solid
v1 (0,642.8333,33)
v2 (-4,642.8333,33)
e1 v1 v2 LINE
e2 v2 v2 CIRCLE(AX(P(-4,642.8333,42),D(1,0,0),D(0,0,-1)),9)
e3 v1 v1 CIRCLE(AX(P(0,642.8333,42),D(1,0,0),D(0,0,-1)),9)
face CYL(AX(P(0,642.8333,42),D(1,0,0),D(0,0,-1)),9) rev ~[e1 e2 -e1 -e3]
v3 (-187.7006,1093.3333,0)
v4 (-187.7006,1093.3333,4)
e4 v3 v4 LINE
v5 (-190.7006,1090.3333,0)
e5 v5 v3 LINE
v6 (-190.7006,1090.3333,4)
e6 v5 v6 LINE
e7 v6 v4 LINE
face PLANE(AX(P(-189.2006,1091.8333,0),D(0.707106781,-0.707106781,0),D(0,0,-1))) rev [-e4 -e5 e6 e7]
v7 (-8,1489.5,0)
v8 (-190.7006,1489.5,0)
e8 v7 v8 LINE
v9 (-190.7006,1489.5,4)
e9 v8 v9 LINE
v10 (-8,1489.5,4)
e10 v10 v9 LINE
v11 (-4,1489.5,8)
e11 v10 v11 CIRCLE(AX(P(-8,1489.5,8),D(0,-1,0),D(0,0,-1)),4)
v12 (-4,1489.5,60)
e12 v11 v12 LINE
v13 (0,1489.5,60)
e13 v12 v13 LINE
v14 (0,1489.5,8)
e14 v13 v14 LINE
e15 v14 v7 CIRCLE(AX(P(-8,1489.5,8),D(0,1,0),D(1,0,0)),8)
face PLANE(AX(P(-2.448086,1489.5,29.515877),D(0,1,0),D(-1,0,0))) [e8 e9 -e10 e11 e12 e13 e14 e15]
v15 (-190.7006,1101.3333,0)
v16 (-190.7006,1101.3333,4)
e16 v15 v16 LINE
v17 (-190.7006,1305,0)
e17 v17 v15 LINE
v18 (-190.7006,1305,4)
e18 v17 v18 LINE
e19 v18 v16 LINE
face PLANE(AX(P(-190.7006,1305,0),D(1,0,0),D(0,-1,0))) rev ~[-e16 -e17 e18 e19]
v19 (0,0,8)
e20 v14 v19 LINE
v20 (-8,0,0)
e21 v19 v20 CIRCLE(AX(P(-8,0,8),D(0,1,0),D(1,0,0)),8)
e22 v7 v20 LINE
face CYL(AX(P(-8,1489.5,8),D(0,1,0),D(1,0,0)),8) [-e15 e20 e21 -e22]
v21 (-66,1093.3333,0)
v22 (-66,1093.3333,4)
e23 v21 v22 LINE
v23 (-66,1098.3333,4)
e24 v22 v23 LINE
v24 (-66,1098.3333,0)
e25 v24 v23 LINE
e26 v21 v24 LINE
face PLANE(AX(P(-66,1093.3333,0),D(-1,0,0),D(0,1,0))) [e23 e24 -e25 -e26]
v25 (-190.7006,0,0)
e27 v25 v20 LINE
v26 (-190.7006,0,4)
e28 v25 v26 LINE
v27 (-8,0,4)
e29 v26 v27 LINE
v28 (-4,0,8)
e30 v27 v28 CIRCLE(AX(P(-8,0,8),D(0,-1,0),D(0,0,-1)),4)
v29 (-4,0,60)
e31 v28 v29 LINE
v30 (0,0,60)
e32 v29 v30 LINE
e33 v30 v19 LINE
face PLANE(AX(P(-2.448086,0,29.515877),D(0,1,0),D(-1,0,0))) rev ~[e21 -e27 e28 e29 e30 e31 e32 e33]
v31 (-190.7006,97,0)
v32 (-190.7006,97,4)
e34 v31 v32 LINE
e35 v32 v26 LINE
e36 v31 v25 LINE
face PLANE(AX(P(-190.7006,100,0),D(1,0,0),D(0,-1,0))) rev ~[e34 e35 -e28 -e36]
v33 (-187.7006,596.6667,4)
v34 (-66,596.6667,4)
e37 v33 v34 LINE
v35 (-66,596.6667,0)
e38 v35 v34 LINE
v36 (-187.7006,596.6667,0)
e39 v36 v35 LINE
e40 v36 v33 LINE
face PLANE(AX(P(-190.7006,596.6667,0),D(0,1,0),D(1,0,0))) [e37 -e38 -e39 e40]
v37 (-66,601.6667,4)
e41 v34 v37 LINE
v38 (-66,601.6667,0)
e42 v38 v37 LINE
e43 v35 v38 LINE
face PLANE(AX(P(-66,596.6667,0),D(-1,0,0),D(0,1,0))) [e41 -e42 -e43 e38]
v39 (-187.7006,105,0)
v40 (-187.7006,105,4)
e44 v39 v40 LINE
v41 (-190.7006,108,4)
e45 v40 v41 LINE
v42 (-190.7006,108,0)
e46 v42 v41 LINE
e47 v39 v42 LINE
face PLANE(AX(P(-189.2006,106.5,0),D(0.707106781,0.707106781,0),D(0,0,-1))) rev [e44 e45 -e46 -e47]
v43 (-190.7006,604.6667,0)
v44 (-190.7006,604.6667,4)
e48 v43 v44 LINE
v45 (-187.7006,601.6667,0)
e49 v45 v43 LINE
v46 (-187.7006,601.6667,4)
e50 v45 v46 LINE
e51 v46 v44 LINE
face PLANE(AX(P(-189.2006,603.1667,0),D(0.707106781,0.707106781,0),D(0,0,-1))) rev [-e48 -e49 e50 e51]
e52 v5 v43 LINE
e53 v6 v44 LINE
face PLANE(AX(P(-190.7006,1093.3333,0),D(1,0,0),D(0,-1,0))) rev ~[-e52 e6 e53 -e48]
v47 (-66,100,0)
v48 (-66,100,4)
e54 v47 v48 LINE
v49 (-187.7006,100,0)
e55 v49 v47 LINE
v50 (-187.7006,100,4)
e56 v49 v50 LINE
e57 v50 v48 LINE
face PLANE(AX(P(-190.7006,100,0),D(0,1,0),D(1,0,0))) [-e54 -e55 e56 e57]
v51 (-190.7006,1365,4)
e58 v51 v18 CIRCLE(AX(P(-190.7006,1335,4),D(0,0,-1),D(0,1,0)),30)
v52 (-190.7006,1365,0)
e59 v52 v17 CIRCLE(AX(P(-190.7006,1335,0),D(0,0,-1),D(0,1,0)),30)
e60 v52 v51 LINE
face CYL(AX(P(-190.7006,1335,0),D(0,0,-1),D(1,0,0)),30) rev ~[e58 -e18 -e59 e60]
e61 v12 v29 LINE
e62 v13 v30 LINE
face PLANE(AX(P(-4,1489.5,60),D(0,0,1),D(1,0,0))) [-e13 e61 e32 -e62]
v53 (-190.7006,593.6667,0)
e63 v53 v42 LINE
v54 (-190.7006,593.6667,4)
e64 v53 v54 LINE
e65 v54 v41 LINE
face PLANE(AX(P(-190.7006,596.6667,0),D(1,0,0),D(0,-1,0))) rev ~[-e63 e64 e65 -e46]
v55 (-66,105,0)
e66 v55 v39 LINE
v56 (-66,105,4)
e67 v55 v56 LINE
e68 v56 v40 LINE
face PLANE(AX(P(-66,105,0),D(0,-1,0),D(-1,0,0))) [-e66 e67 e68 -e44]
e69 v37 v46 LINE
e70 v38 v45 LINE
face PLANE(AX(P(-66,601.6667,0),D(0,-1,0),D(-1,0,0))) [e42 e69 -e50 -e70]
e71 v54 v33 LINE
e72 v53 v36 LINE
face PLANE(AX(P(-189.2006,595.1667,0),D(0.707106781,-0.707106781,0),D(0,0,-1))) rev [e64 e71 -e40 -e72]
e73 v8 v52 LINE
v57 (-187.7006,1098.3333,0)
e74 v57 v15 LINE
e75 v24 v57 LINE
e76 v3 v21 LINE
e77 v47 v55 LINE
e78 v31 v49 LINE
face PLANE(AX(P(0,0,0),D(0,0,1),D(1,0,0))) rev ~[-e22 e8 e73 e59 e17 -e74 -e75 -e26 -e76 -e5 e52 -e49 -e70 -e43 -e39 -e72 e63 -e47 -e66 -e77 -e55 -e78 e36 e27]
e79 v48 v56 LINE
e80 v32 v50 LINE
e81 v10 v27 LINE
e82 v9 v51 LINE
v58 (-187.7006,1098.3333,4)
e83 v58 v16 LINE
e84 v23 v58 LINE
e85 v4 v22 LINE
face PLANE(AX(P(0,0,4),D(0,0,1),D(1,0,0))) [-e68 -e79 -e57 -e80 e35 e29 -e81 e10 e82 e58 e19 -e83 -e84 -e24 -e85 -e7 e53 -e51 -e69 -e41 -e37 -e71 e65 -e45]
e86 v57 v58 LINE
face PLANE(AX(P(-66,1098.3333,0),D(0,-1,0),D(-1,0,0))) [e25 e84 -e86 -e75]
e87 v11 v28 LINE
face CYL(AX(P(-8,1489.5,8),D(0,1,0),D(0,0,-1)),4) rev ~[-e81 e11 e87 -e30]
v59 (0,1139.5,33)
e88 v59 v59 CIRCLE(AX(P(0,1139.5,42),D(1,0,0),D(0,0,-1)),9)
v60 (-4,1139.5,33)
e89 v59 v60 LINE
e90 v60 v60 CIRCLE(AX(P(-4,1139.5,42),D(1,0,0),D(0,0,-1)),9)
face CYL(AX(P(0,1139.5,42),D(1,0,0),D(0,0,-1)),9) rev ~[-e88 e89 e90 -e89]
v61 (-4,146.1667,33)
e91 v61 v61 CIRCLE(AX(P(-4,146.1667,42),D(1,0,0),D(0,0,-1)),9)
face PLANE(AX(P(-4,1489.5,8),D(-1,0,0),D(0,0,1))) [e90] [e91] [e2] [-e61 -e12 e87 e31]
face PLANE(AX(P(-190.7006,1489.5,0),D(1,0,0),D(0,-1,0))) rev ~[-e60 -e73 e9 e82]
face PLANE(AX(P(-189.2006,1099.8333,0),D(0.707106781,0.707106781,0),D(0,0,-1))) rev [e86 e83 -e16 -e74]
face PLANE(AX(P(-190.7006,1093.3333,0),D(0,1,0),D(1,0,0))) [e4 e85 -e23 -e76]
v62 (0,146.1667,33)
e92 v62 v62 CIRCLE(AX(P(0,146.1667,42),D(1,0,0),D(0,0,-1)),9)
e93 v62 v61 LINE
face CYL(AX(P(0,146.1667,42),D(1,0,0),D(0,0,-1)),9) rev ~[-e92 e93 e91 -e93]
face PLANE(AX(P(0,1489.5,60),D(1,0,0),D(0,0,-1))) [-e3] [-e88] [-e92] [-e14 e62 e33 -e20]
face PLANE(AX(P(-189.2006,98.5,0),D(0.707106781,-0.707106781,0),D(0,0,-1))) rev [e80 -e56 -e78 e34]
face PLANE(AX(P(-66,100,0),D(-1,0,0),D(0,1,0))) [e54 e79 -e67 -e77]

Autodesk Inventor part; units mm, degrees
ref_plane "YZ Plane" through (0, 0, 0) normal (1, 0, 0) x (0, 1, 0)
ref_plane "XZ Plane" through (0, 0, 0) normal (0, 1, 0) x (-1, 0, 0)
ref_plane "XY Plane" through (0, 0, 0) normal (0, 0, 1) x (1, 0, 0)
sketch "Sketch1" plane through (0, 0, 0) normal (0, 0, 1) x (1, 0, 0)
  line L0 (0, 1489.5) -> (-190.7006, 1489.5)
  line L1 (-190.7006, 1489.5) -> (-190.7006, 0)
  line L2 (-190.7006, 0) -> (0, 0)
  line L3 (0, 0) -> (0, 1489.5)
  line L4 (-190.7006, 100) -> (-66, 100)
  line L5 (-66, 100) -> (-66, 105)
  line L6 (-66, 105) -> (-190.7006, 105)
  line L7 (-190.7006, 105) -> (-190.7006, 100)
  line L8 (-190.7006, 596.6667) -> (-66, 596.6667)
  line L9 (-66, 596.6667) -> (-66, 601.6667)
  line L10 (-66, 601.6667) -> (-190.7006, 601.6667)
  line L11 (-190.7006, 601.6667) -> (-190.7006, 596.6667)
  line L12 (-190.7006, 1093.3333) -> (-66, 1093.3333)
  line L13 (-66, 1093.3333) -> (-66, 1098.3333)
  line L14 (-66, 1098.3333) -> (-190.7006, 1098.3333)
  line L15 (-190.7006, 1098.3333) -> (-190.7006, 1093.3333)
  circle A0 centre (-190.7006, 1335) radius 30
  point P0 (-190.7006, 1098.3333)
  point P1 (-190.7006, 1093.3333)
  point P2 (-190.7006, 601.6667)
  point P3 (-190.7006, 596.6667)
  point P4 (-190.7006, 1365)
  point P5 (-190.7006, 1305)
  dimension "d0" = 1489.5
  dimension "d1" = 190.7006
  dimension "d2" = 5
  dimension "d4" = 100
  dimension "d7" = 496.6667
  dimension "d23" = 66
  dimension "d29" = 60
  dimension "d30" = 1335
extrude "Plate1" add sketch "Sketch1" along normal blind 4 contours L3 L2 L1 L4 L5 L6 L8 L9 L10 L12 L13 L14 A0 L0
sketch "Sketch2" plane through (-4, 1489.5, 0) normal (1, 0, 0) x (0, 1, 0)
  line L0 (-1489.5, 0) -> (0, 0)
  line L1 (0, 0) -> (0, 60)
  line L2 (0, 60) -> (-1489.5, 60)
  line L3 (-1489.5, 60) -> (-1489.5, 0)
edge flange "Flange1" height 60 angle 90 thickness 4 bend radius 4 thickness toward (1, 0, 0) relief tear relief width 4 relief depth 2 edges at (0, 744.75, 4) wall of the first edge with corners at (-4, 0, 0) (-4, 1489.5, 0) (-4, 1489.5, 60) (-4, 0, 60)
bend "Bend1"
corner "Corner1"
chamfer "Corner Chamfer1" distance 3 angle 45 6 edges at (-190.7006, 100, 2) (-190.7006, 105, 2) (-190.7006, 596.6667, 2) (-190.7006, 601.6667, 2) (-190.7006, 1098.3333, 2) (-190.7006, 1093.3333, 2)
sketch "Sketch4" plane through (0, 0, 60) normal (1, 0, 0) x (0, 0, -1)
  line L0 (52, 0) -> (52, 1489.5) construction
  line L1 (0, 1489.5) -> (52, 1489.5) construction
  line L2 (0, 0) -> (0, 1489.5) construction
  line L3 (52, 0) -> (0, 0) projected
  circle A0 centre (18, 1139.5) radius 9
  circle A1 centre (18, 642.8333) radius 9
  circle A2 centre (18, 146.1667) radius 9
  point P0 (60, 0)
  dimension "d31" = 18
  dimension "d32" = 18
  dimension "d33" = 350
  dimension "d36" = 496.6667
extrude "Cut1" cut sketch "Sketch4" against normal blind 4
equation "\"d0\" = Стрингер_длина"
equation "\"d1\" = стрингер_глубина_1"
equation "\"d2\" = паз_под_стрингер_толщина"
equation "\"d7\" = Шаг_шпангоутов"
equation "\"d23\" = паз_под_стрингер_глубина - Thickness"
equation "\"d29\" = 2 * радиус_выреза_под_сварку"
equation "\"d36\" = Шаг_шпангоутов"
equation "\"d41\" = Thickness"
equation "\"d12\" = Thickness"
equation "\"d13\" = BendReliefWidth"
equation "\"d14\" = BendReliefDepth"
equation "\"d15\" = MinimumRemnant"
equation "\"d16\" = TransitionRadius"
equation "\"d17\" = ребро_усилителей"
equation "\"d19\" = BendRadius"
equation "\"d20\" = CornerReliefSize"
equation "\"d21\" = GapSize"
equation "\"d22\" = JacobiRadiusSize"
equation "\"BendRadius\" = Thickness"
equation "\"BendReliefWidth\" = Thickness"
equation "\"BendReliefDepth\" = 0.5 * Thickness"
equation "\"CornerReliefSize\" = 4 * Thickness"
equation "\"MinimumRemnant\" = 2 * Thickness"
equation "\"TransitionRadius\" = BendRadius"
equation "\"JacobiRadiusSize\" = BendRadius"
equation "\"GapSize\" = Thickness"
equation "\"Стрингер_длина\" = 1489.5"
equation "\"стрингер_глубина_1\" = 190.700557"
equation "\"паз_под_стрингер_толщина\" = 5"
equation "\"Шаг_шпангоутов\" = 496.666667"
equation "\"паз_под_стрингер_глубина\" = 70"
equation "\"Thickness\" = 4"
equation "\"радиус_выреза_под_сварку\" = 30"
equation "\"ребро_усилителей\" = 60"
properties part number "GBK 0102 stringer 1" material "Steel"
